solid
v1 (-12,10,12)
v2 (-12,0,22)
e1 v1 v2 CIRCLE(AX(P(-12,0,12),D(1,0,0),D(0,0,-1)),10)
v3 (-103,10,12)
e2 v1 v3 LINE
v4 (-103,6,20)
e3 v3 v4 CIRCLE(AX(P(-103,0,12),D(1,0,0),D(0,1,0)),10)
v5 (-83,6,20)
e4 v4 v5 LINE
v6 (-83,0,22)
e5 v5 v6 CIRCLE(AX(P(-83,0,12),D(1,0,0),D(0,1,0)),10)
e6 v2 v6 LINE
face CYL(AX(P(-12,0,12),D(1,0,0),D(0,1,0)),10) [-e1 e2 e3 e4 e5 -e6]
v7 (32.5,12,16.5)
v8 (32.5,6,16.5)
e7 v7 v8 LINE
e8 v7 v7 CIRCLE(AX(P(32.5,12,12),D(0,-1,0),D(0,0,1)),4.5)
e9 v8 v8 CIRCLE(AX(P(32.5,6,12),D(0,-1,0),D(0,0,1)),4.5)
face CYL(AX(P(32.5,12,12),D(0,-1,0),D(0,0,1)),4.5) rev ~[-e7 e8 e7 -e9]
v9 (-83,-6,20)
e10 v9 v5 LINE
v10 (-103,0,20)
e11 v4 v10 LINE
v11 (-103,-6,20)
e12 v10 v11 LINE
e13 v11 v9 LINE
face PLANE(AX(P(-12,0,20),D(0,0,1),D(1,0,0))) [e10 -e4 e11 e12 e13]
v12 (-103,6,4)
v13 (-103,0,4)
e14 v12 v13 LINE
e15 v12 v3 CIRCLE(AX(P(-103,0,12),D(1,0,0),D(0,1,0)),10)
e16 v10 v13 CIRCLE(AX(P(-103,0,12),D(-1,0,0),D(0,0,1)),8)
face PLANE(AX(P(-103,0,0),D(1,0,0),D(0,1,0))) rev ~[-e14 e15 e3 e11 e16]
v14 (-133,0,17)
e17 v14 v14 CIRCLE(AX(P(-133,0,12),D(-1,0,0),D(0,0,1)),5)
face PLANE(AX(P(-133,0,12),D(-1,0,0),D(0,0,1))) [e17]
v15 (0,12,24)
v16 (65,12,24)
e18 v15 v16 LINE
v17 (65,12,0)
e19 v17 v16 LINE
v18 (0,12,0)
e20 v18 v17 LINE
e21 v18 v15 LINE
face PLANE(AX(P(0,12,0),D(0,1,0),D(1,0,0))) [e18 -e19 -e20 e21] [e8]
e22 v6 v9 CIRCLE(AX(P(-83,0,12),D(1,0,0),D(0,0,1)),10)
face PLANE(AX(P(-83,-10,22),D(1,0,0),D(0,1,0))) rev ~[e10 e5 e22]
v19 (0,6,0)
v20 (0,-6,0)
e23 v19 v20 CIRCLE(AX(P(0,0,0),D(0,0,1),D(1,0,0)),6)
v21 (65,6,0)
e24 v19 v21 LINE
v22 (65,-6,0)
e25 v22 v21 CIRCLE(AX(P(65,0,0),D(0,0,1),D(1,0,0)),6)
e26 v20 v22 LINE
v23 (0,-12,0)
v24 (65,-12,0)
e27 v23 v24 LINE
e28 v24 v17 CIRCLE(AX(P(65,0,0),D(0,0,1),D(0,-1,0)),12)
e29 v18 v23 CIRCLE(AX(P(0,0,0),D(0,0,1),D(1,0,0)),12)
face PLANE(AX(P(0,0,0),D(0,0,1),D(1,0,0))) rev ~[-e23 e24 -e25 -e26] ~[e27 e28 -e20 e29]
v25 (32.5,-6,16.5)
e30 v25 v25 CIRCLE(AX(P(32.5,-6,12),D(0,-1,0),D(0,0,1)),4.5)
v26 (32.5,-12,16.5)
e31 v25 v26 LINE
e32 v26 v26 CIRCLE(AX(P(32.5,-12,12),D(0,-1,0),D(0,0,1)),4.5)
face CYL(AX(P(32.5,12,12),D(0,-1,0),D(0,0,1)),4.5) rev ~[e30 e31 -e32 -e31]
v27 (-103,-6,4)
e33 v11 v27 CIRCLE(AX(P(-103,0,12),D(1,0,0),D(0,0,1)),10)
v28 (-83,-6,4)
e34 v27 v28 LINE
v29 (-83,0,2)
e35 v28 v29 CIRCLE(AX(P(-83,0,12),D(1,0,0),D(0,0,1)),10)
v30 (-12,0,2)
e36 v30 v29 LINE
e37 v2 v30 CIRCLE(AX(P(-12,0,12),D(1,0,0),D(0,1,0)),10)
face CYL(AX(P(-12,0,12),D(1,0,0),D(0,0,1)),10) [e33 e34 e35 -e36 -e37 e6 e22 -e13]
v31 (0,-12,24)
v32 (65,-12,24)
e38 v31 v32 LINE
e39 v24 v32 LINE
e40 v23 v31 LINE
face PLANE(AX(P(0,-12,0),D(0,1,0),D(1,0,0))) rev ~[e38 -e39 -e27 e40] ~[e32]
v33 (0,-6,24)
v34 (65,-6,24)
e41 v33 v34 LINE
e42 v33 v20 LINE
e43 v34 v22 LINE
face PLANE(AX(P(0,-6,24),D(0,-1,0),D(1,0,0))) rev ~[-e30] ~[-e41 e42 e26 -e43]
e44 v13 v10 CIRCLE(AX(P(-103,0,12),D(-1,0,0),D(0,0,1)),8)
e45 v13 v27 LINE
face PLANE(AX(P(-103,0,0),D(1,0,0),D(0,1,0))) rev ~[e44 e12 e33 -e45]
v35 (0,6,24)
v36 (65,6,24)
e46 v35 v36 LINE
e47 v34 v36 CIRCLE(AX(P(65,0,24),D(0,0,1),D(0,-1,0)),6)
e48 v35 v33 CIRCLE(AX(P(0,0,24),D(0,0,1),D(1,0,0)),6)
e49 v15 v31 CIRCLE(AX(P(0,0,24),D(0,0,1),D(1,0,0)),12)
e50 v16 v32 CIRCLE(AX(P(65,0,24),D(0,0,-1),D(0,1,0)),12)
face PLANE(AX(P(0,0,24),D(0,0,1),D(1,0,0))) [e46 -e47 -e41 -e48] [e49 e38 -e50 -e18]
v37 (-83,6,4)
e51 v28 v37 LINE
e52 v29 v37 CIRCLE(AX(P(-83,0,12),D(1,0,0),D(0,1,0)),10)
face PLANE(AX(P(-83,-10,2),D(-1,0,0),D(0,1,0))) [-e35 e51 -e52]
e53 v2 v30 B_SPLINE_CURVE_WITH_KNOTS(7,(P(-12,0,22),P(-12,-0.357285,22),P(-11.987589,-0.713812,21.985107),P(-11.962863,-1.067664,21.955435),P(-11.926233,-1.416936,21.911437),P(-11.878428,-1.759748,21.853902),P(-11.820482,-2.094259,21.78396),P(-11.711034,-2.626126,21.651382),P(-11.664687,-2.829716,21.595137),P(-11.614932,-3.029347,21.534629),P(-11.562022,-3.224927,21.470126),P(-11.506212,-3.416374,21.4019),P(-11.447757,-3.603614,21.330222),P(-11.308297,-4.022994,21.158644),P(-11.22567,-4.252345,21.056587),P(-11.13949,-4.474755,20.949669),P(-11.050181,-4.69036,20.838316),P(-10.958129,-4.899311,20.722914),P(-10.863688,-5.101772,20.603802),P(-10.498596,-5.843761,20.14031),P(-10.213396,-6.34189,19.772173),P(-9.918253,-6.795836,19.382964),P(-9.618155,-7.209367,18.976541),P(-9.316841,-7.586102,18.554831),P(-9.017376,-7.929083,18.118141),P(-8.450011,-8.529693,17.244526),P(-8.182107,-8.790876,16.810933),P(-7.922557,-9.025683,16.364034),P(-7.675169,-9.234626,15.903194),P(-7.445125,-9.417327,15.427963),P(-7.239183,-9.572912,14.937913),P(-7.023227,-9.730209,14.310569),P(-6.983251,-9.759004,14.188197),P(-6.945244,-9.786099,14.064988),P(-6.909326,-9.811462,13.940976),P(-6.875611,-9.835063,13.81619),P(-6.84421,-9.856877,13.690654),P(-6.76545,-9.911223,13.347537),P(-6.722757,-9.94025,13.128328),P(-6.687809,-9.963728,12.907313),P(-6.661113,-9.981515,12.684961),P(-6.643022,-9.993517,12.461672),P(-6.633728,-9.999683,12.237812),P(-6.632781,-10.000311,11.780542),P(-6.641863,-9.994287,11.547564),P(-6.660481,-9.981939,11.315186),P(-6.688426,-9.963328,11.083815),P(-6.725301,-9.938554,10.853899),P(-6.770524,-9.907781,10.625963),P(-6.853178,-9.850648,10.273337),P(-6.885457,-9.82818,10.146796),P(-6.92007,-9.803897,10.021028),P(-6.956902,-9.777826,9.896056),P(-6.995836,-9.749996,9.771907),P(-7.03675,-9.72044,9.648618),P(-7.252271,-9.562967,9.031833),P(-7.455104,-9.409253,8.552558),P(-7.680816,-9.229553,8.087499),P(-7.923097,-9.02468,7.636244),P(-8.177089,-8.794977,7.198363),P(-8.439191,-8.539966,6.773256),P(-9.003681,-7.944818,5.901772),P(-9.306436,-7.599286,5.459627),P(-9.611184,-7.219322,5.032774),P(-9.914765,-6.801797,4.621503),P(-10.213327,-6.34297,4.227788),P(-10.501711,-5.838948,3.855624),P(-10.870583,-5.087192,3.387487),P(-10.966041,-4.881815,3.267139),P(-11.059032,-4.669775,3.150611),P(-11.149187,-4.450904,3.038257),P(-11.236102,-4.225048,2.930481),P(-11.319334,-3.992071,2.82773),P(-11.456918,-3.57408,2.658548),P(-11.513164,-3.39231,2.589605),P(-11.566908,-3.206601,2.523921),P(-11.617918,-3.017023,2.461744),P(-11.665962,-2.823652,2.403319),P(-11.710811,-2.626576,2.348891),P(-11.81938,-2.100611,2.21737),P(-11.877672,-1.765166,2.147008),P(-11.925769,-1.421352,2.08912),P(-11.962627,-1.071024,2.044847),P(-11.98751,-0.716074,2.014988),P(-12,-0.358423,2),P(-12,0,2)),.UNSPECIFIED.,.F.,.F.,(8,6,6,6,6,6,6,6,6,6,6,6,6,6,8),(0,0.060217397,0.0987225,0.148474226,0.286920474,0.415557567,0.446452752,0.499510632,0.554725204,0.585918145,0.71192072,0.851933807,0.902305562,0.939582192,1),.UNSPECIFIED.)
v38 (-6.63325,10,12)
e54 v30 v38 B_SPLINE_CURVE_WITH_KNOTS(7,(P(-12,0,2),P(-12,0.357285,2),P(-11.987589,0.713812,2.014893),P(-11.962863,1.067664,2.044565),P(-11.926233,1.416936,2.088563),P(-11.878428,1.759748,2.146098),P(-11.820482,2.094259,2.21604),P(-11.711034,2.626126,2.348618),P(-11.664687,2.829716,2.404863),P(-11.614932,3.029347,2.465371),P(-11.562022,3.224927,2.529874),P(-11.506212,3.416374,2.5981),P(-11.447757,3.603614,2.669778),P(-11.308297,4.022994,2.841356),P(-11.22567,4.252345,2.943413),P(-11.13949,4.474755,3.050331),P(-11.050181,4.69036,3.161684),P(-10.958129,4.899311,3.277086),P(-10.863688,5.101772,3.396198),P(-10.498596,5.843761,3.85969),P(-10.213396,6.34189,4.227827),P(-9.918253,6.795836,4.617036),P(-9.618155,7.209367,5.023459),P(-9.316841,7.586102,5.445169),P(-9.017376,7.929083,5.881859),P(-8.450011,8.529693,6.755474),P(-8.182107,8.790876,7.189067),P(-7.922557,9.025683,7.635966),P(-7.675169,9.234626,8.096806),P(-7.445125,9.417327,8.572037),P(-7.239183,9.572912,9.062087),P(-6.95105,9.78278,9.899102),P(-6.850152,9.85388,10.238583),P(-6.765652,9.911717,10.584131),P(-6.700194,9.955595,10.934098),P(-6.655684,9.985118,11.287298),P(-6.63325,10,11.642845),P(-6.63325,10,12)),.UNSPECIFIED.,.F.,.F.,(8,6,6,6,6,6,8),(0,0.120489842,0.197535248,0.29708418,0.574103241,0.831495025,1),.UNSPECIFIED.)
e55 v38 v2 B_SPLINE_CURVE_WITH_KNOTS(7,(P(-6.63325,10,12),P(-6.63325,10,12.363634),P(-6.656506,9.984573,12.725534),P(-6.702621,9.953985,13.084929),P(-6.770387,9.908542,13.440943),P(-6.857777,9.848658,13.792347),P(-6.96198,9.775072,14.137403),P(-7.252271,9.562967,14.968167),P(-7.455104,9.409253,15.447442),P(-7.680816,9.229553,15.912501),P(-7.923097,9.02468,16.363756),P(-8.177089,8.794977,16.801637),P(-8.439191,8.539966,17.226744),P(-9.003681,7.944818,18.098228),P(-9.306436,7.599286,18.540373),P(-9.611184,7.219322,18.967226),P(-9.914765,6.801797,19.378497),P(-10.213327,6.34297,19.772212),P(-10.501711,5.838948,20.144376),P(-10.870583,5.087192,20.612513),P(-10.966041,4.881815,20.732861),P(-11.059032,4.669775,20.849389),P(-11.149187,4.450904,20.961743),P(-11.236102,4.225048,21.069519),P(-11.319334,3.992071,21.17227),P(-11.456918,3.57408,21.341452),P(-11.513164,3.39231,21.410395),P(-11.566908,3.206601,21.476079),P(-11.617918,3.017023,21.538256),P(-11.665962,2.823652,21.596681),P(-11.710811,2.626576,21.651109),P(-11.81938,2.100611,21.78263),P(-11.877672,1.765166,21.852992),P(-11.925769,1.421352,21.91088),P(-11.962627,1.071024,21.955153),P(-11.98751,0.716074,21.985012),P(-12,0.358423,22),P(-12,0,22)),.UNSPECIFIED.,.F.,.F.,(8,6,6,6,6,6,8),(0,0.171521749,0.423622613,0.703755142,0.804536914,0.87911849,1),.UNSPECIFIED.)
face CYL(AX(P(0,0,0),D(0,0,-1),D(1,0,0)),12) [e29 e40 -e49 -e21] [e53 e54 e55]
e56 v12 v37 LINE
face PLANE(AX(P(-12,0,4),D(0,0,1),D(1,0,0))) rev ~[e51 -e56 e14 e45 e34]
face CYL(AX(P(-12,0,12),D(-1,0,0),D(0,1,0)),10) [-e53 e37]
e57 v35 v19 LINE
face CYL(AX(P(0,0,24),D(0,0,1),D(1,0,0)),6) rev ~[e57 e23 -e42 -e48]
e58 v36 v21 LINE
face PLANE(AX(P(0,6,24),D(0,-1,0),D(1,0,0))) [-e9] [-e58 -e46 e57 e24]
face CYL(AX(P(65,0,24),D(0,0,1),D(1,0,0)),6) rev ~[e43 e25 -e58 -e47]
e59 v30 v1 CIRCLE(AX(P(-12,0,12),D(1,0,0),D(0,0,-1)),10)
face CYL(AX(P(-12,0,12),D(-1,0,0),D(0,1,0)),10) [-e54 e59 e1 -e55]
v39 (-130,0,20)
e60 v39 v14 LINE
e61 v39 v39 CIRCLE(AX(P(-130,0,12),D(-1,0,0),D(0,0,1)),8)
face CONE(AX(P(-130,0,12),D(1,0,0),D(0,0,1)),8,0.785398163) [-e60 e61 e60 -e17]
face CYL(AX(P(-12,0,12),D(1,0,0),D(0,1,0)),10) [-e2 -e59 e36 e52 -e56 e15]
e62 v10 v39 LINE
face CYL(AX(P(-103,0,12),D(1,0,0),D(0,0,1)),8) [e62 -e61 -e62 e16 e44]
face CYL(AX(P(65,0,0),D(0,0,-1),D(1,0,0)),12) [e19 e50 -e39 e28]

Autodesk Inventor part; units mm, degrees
sketch "Sketch1" plane through (0, 0, 0) normal (0, 0, 1) x (1, 0, 0)
  line L0 (0, 0) -> (65, 0)
  circle A0 centre (0, 0) radius 12
  circle A1 centre (65, 0) radius 12
  line L1 (0, 12) -> (65, 12)
  line L2 (0, -12) -> (65, -12)
  dimension "d0" = 65
  dimension "d1" = 24
extrude "Extrusion1" add sketch "Sketch1" along normal blind 24
sketch "Sketch2" plane through (0, 0, 24) normal (0, 0, 1) x (1, 0, 0)
  circle A0 centre (0, 0) radius 6
  arc A1 (65, -12) -> (65, 12) centre (65, 0) ccw projected
  circle A2 centre (65, 0) radius 6
  line L0 (0, 6) -> (65, 6)
  line L1 (0, -6) -> (65, -6)
  dimension "d4" = 12
extrude "Extrusion2" cut sketch "Sketch2" against normal through all
sketch "Sketch3" plane through (0, 12, 0) normal (0, 1, 0) x (1, 0, 0)
  point P0 (0, 0)
  point P1 (32.5, -12)
hole "Hole1" at (32.5, 12, 12) direction (0, -1, 0) diameter 9 end through all
ref_plane "Work Plane1" through (-12, 0, 0) normal (1, 0, 0) x (0, 1, 0)
sketch "Sketch4" plane through (-12, 0, 0) normal (1, 0, 0) x (0, 1, 0)
  circle A0 centre (0, 12) radius 10
  point P0 (0, 0)
  dimension "d14" = 20
extrude "Extrusion3" add sketch "Sketch4" along normal blind 6
sketch "Sketch5" plane through (-12, 0, 0) normal (1, 0, 0) x (0, 1, 0)
  arc A0 (0, 22) -> (0, 2) centre (0, 12) ccw projected
  circle A1 centre (0, 12) radius 10
  point P0 (0, 0)
  point P1 (0, 2)
  dimension "d17" = 20
extrude "Extrusion4" add sketch "Sketch5" against normal blind 91
sketch "Sketch6" plane through (-103, 0, 12) normal (-1, 0, 0) x (0, 0, 1)
  circle A0 centre (0, 0) radius 8
  point P0 (-12, 0)
  dimension "d20" = 16
extrude "Extrusion5" add sketch "Sketch6" along normal blind 30
chamfer "Chamfer1" distance 3 angle 45 1 edges at (-133, 0, 4) measured on face at (-133, -1.0645, 14.108)
ref_plane "Work Plane2" through (-12, 0, 22) normal (0, 0, 1) x (1, 0, 0)
sketch "Sketch7" plane through (-12, 0, 22) normal (0, 0, 1) x (1, 0, 0)
  line L0 (-91, -10) -> (5.3668, -10) projected
  line L1 (-91, 10) -> (5.3668, 10) projected
  line L2 (-91, 10) -> (-91, -10) projected
  line L3 (-91, -10) -> (-71, -10)
  line L4 (-71, -10) -> (-71, 10)
  line L5 (-71, 10) -> (-91, 10)
  line L6 (-91, 10) -> (-91, -10)
  point P0 (12, 0)
  point P1 (-71, -10)
  dimension "d26" = 20
extrude "Extrusion6" cut sketch "Sketch7" against normal blind 2
ref_plane "Work Plane3" through (-12, 0, 2) normal (0, 0, 1) x (1, 0, 0)
sketch "Sketch8" plane through (-12, 0, 2) normal (0, 0, 1) x (1, 0, 0)
  line L0 (-91, -10) -> (5.3668, -10) projected
  line L1 (-91, 10) -> (-91, -10) projected
  line L2 (-91, 10) -> (5.3668, 10) projected
  line L3 (-91, -10) -> (-71, -10)
  line L4 (-71, -10) -> (-71, 10)
  line L5 (-71, 10) -> (-91, 10)
  line L6 (-91, 10) -> (-91, -10)
  point P0 (12, 0)
  point P1 (-91, 6)
  point P2 (-91, -6)
  point P3 (-71, -10)
  dimension "d29" = 20
extrude "Extrusion7" cut sketch "Sketch8" along normal blind 2
properties part number "hf2"
